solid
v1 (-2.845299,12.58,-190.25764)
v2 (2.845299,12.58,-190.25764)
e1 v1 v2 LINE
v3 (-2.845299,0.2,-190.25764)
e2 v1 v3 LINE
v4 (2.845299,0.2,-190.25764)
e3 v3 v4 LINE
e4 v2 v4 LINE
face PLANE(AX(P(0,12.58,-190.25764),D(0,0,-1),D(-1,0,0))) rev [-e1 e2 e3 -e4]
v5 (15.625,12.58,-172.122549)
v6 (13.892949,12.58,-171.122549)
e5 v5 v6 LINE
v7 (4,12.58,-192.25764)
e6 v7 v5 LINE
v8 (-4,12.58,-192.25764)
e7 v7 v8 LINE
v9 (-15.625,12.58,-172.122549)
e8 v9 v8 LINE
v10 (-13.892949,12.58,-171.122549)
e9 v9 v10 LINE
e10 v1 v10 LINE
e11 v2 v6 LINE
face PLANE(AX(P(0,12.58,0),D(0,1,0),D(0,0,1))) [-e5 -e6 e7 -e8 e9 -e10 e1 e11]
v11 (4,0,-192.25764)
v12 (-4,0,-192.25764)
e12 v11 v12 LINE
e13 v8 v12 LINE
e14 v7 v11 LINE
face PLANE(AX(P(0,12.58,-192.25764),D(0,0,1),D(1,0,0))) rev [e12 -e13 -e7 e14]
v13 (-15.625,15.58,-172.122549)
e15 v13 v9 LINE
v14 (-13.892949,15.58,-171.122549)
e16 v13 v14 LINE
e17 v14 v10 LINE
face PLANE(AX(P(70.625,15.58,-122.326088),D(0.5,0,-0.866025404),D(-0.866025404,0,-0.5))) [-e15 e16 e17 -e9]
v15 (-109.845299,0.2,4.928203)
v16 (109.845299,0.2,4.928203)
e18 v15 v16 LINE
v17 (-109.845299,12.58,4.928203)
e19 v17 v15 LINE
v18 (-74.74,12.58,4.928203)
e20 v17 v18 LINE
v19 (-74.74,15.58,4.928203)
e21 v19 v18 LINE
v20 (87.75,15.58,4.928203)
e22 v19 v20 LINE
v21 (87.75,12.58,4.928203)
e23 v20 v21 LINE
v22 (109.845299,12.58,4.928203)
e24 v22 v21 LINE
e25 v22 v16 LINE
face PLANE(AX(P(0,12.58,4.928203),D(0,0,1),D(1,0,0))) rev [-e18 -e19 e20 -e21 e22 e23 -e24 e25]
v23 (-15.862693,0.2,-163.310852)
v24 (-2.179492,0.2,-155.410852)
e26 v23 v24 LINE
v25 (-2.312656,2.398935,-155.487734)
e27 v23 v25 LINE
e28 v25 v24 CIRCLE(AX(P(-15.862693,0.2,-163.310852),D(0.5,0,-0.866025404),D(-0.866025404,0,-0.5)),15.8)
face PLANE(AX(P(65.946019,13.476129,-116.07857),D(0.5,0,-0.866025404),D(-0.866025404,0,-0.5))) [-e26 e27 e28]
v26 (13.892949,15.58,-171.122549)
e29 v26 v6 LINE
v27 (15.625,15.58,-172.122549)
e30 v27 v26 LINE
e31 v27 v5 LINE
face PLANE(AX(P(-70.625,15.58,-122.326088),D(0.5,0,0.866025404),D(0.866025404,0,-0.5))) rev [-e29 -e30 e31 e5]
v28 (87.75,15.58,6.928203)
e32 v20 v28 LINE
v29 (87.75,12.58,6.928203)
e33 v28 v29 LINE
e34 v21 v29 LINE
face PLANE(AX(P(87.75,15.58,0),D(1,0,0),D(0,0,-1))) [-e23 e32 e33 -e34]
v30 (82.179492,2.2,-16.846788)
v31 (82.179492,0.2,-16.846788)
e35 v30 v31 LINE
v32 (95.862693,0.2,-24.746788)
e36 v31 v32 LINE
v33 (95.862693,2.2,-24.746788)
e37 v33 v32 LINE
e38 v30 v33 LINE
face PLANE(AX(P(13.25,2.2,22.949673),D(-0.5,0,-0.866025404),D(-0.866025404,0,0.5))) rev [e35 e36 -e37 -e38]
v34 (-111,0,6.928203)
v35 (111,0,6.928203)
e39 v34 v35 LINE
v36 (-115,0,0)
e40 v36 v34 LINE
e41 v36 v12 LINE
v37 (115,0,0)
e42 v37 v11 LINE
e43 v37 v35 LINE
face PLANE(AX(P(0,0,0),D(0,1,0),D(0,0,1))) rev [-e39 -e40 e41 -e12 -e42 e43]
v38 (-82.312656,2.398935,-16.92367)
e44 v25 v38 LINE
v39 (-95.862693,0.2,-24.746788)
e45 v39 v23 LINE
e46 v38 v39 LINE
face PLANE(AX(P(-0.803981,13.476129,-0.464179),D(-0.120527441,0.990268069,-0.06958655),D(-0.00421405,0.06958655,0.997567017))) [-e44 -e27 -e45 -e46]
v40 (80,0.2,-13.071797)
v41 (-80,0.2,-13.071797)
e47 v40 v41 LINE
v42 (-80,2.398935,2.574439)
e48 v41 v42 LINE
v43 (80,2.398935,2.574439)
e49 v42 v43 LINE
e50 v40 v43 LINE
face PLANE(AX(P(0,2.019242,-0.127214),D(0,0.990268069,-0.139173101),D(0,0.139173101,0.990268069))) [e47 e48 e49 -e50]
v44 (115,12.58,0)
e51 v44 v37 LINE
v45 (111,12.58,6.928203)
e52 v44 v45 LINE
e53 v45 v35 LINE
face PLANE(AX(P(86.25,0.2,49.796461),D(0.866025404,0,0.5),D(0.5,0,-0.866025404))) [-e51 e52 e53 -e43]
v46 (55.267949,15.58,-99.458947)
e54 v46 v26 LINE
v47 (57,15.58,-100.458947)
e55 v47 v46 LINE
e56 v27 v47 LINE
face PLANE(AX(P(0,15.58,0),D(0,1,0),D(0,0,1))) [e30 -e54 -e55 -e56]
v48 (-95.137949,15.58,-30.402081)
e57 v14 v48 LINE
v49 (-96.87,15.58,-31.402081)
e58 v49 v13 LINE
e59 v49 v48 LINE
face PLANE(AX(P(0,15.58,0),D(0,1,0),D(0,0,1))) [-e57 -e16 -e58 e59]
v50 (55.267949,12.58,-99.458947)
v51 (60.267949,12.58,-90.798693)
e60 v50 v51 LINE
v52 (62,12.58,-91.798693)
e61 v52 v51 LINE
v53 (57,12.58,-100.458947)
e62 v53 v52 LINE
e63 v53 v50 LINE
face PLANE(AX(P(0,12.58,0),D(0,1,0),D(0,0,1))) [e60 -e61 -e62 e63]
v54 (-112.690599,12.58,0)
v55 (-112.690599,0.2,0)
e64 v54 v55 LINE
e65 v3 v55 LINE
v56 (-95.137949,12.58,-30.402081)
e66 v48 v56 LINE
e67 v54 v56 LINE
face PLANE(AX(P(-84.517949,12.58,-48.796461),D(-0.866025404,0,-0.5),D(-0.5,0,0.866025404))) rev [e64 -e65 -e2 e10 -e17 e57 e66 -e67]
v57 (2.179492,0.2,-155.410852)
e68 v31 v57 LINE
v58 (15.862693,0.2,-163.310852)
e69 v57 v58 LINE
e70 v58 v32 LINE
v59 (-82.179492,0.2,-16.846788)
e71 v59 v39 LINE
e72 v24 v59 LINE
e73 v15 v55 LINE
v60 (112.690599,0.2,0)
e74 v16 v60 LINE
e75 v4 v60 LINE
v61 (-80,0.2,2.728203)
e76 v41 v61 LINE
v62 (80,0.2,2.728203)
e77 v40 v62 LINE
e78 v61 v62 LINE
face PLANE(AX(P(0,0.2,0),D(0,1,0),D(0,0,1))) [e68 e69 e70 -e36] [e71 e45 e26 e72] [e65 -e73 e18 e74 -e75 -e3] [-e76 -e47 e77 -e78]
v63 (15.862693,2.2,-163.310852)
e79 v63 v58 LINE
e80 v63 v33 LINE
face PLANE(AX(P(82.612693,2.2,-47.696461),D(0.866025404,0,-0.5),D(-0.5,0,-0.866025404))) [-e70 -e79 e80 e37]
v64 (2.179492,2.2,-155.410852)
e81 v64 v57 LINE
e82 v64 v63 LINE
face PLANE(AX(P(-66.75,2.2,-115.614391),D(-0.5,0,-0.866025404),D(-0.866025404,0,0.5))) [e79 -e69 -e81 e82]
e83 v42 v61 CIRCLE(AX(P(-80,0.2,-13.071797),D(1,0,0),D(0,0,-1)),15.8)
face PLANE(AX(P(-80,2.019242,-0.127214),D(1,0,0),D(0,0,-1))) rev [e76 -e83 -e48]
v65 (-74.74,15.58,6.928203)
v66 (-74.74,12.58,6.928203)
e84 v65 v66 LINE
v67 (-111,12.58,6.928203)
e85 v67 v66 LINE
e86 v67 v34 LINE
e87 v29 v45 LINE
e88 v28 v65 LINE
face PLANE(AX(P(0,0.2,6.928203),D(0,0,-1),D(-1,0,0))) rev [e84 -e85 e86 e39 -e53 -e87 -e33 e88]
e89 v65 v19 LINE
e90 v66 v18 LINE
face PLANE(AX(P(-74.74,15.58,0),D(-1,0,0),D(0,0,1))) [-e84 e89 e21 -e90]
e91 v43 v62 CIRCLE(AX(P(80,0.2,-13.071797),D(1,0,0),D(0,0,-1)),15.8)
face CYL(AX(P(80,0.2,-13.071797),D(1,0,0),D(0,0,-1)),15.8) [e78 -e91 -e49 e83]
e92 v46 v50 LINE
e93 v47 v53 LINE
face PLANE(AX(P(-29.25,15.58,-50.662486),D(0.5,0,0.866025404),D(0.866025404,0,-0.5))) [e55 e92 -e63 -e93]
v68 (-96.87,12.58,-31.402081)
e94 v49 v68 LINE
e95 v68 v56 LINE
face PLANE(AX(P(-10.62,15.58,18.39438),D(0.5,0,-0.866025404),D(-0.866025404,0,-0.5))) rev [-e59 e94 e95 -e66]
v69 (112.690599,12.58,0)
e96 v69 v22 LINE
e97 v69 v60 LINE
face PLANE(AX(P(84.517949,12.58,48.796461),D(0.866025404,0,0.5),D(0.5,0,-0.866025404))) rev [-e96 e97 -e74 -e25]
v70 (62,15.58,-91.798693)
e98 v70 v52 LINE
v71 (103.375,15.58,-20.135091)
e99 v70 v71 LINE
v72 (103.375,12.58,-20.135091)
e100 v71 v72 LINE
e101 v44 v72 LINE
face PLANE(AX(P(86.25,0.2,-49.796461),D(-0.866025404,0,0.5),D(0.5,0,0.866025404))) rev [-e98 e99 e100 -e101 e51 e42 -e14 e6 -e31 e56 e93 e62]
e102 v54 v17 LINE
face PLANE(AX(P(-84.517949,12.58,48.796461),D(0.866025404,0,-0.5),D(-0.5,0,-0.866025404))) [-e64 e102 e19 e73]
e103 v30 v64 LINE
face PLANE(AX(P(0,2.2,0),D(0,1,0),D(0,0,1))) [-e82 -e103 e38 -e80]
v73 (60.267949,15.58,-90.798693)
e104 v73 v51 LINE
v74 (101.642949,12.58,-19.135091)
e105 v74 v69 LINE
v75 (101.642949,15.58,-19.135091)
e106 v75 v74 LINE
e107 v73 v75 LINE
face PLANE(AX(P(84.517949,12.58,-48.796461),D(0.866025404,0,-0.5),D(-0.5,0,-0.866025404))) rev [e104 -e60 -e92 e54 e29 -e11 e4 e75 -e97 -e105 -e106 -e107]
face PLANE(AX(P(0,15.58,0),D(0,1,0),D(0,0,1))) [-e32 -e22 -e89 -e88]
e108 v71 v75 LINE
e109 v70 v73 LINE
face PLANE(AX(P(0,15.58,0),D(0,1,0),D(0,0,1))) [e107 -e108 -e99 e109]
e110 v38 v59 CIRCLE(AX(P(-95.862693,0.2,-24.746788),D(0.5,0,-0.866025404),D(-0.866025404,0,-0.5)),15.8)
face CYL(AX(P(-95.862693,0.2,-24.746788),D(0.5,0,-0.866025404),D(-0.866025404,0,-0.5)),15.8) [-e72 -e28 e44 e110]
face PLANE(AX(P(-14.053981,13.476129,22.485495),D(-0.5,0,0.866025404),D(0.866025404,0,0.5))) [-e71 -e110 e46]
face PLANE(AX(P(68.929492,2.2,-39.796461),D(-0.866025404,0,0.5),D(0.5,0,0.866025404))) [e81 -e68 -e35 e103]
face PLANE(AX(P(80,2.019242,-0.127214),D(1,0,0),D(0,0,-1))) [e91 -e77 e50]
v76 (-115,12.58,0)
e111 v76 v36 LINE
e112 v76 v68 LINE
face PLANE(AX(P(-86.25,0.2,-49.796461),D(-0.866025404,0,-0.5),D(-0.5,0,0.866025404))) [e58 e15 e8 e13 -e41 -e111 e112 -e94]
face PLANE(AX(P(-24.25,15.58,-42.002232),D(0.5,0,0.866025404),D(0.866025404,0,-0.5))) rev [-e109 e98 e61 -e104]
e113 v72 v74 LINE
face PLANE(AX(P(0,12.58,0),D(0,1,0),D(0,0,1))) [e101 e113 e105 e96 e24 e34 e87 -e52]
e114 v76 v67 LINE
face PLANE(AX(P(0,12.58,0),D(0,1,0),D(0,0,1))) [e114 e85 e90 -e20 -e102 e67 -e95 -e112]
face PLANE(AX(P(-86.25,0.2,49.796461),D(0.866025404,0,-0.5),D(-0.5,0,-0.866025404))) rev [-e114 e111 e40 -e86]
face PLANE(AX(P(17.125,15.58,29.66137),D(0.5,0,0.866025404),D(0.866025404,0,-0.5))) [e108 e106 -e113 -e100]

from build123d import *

# Parameters (mm, degrees)
BOSS_EXTRUDE1_DEPTH = 0.2
BOSS_EXTRUDE2_DEPTH = 12.58
SKETCH1_4_W         = 162.49
SKETCH1_4_H         = 2
BOSS_EXTRUDE3_DEPTH = 15.58
BOSS_EXTRUDE5_DEPTH = 2
SKETCH3_7_W         = 160
SKETCH3_7_H         = 15.8
REVOLVE3_ANGLE      = 8
REVOLVE4_ANGLE      = 8


# Read off the part's stored shape, not the designer's step: Boss-Extrude2
with BuildPart() as part:
    # Sketch1 → Boss-Extrude1 (new body)
    with BuildSketch(Plane(origin=(0, 0, 0), x_dir=(1, 0, 0), z_dir=(0, 1, 0))):
        Polygon((-115, 0), (-111, -6.92820323), (111, -6.92820323), (115, 0), (15.625, 172.122549002), (13.892949192, 171.122549002), (2.845299462, 190.25763964), (-2.845299462, 190.25763964), (-13.892949192, 171.122549002), (-15.625, 172.122549002), align=None)
    extrude(amount=BOSS_EXTRUDE1_DEPTH)

    # Boss-Extrude2 outline → Boss-Extrude2 (add)
    with BuildSketch(Plane(origin=(0, 0, 0), x_dir=(1, 0, 0), z_dir=(0, 1, 0))):
        Polygon((15.625, 172.122549002), (4, 192.25763964), (-4, 192.25763964), (-15.625, 172.122549002), (-13.892949192, 171.122549002), (-2.845299462, 190.25763964), (2.845299462, 190.25763964), (13.892949192, 171.122549002), align=None)
        Polygon((62, 91.798692801), (57, 100.458946839), (55.267949192, 99.458946839), (60.267949192, 90.798692801), align=None)
        Polygon((-95.137949192, 30.402081141), (-96.87, 31.402081141), (-115, 0), (-111, -6.92820323), (-74.74, -6.92820323), (-74.74, -4.92820323), (-109.845299462, -4.92820323), (-112.690598923, 0), align=None)
        Polygon((115, 0), (103.375, 20.135090638), (101.642949192, 19.135090638), (112.690598923, 0), (109.845299462, -4.92820323), (87.75, -4.92820323), (87.75, -6.92820323), (111, -6.92820323), align=None)
    extrude(amount=BOSS_EXTRUDE2_DEPTH)

    # Sketch1<4> → Boss-Extrude3 (add)
    with BuildSketch(Plane(origin=(0, 0, 0), x_dir=(1, 0, 0), z_dir=(0, 1, 0))):
        Polygon((-15.625, 172.122549002), (-96.87, 31.402081141), (-95.137949192, 30.402081141), (-13.892949192, 171.122549002), align=None)
        with Locations((6.505, -5.92820323)):
            Rectangle(SKETCH1_4_W, SKETCH1_4_H)
        Polygon((57, 100.458946839), (15.625, 172.122549002), (13.892949192, 171.122549002), (55.267949192, 99.458946839), align=None)
        Polygon((101.642949192, 19.135090638), (103.375, 20.135090638), (62, 91.798692801), (60.267949192, 90.798692801), align=None)
    extrude(amount=BOSS_EXTRUDE3_DEPTH)

    # Sketch3 → Boss-Extrude5 (add)
    with BuildSketch(Plane(origin=(0, 0.2, 0), x_dir=(1, 0, 0), z_dir=(0, 1, 0))):
        Polygon((2.179491924, 155.410852123), (15.862693304, 163.310852123), (95.862693304, 24.746787517), (82.179491924, 16.846787517), align=None)
    extrude(amount=BOSS_EXTRUDE5_DEPTH)

    # Sketch3<7> → Revolve3 (revolve)
    with BuildSketch(Plane(origin=(0, 0.2, 0), x_dir=(1, 0, 0), z_dir=(0, 1, 0))):
        with Locations((0, 5.17179677)):
            Rectangle(SKETCH3_7_W, SKETCH3_7_H)
    revolve(axis=Axis((80, 0.2, -13.07179677), (-1, 0, 0)), revolution_arc=REVOLVE3_ANGLE)

    # Sketch3<8> → Revolve4 (revolve)
    with BuildSketch(Plane(origin=(0, 0.2, 0), x_dir=(1, 0, 0), z_dir=(0, 1, 0))):
        Polygon((-15.862693304, 163.310852123), (-2.179491924, 155.410852123), (-42.179491924, 86.12881982), (-82.179491924, 16.846787517), (-95.862693304, 24.746787517), align=None)
    revolve(axis=Axis((-95.862693304, 0.2, -24.746787517), (-0.500000000000001, 0, 0.866025403784438)), revolution_arc=REVOLVE4_ANGLE)


solid = part.part
